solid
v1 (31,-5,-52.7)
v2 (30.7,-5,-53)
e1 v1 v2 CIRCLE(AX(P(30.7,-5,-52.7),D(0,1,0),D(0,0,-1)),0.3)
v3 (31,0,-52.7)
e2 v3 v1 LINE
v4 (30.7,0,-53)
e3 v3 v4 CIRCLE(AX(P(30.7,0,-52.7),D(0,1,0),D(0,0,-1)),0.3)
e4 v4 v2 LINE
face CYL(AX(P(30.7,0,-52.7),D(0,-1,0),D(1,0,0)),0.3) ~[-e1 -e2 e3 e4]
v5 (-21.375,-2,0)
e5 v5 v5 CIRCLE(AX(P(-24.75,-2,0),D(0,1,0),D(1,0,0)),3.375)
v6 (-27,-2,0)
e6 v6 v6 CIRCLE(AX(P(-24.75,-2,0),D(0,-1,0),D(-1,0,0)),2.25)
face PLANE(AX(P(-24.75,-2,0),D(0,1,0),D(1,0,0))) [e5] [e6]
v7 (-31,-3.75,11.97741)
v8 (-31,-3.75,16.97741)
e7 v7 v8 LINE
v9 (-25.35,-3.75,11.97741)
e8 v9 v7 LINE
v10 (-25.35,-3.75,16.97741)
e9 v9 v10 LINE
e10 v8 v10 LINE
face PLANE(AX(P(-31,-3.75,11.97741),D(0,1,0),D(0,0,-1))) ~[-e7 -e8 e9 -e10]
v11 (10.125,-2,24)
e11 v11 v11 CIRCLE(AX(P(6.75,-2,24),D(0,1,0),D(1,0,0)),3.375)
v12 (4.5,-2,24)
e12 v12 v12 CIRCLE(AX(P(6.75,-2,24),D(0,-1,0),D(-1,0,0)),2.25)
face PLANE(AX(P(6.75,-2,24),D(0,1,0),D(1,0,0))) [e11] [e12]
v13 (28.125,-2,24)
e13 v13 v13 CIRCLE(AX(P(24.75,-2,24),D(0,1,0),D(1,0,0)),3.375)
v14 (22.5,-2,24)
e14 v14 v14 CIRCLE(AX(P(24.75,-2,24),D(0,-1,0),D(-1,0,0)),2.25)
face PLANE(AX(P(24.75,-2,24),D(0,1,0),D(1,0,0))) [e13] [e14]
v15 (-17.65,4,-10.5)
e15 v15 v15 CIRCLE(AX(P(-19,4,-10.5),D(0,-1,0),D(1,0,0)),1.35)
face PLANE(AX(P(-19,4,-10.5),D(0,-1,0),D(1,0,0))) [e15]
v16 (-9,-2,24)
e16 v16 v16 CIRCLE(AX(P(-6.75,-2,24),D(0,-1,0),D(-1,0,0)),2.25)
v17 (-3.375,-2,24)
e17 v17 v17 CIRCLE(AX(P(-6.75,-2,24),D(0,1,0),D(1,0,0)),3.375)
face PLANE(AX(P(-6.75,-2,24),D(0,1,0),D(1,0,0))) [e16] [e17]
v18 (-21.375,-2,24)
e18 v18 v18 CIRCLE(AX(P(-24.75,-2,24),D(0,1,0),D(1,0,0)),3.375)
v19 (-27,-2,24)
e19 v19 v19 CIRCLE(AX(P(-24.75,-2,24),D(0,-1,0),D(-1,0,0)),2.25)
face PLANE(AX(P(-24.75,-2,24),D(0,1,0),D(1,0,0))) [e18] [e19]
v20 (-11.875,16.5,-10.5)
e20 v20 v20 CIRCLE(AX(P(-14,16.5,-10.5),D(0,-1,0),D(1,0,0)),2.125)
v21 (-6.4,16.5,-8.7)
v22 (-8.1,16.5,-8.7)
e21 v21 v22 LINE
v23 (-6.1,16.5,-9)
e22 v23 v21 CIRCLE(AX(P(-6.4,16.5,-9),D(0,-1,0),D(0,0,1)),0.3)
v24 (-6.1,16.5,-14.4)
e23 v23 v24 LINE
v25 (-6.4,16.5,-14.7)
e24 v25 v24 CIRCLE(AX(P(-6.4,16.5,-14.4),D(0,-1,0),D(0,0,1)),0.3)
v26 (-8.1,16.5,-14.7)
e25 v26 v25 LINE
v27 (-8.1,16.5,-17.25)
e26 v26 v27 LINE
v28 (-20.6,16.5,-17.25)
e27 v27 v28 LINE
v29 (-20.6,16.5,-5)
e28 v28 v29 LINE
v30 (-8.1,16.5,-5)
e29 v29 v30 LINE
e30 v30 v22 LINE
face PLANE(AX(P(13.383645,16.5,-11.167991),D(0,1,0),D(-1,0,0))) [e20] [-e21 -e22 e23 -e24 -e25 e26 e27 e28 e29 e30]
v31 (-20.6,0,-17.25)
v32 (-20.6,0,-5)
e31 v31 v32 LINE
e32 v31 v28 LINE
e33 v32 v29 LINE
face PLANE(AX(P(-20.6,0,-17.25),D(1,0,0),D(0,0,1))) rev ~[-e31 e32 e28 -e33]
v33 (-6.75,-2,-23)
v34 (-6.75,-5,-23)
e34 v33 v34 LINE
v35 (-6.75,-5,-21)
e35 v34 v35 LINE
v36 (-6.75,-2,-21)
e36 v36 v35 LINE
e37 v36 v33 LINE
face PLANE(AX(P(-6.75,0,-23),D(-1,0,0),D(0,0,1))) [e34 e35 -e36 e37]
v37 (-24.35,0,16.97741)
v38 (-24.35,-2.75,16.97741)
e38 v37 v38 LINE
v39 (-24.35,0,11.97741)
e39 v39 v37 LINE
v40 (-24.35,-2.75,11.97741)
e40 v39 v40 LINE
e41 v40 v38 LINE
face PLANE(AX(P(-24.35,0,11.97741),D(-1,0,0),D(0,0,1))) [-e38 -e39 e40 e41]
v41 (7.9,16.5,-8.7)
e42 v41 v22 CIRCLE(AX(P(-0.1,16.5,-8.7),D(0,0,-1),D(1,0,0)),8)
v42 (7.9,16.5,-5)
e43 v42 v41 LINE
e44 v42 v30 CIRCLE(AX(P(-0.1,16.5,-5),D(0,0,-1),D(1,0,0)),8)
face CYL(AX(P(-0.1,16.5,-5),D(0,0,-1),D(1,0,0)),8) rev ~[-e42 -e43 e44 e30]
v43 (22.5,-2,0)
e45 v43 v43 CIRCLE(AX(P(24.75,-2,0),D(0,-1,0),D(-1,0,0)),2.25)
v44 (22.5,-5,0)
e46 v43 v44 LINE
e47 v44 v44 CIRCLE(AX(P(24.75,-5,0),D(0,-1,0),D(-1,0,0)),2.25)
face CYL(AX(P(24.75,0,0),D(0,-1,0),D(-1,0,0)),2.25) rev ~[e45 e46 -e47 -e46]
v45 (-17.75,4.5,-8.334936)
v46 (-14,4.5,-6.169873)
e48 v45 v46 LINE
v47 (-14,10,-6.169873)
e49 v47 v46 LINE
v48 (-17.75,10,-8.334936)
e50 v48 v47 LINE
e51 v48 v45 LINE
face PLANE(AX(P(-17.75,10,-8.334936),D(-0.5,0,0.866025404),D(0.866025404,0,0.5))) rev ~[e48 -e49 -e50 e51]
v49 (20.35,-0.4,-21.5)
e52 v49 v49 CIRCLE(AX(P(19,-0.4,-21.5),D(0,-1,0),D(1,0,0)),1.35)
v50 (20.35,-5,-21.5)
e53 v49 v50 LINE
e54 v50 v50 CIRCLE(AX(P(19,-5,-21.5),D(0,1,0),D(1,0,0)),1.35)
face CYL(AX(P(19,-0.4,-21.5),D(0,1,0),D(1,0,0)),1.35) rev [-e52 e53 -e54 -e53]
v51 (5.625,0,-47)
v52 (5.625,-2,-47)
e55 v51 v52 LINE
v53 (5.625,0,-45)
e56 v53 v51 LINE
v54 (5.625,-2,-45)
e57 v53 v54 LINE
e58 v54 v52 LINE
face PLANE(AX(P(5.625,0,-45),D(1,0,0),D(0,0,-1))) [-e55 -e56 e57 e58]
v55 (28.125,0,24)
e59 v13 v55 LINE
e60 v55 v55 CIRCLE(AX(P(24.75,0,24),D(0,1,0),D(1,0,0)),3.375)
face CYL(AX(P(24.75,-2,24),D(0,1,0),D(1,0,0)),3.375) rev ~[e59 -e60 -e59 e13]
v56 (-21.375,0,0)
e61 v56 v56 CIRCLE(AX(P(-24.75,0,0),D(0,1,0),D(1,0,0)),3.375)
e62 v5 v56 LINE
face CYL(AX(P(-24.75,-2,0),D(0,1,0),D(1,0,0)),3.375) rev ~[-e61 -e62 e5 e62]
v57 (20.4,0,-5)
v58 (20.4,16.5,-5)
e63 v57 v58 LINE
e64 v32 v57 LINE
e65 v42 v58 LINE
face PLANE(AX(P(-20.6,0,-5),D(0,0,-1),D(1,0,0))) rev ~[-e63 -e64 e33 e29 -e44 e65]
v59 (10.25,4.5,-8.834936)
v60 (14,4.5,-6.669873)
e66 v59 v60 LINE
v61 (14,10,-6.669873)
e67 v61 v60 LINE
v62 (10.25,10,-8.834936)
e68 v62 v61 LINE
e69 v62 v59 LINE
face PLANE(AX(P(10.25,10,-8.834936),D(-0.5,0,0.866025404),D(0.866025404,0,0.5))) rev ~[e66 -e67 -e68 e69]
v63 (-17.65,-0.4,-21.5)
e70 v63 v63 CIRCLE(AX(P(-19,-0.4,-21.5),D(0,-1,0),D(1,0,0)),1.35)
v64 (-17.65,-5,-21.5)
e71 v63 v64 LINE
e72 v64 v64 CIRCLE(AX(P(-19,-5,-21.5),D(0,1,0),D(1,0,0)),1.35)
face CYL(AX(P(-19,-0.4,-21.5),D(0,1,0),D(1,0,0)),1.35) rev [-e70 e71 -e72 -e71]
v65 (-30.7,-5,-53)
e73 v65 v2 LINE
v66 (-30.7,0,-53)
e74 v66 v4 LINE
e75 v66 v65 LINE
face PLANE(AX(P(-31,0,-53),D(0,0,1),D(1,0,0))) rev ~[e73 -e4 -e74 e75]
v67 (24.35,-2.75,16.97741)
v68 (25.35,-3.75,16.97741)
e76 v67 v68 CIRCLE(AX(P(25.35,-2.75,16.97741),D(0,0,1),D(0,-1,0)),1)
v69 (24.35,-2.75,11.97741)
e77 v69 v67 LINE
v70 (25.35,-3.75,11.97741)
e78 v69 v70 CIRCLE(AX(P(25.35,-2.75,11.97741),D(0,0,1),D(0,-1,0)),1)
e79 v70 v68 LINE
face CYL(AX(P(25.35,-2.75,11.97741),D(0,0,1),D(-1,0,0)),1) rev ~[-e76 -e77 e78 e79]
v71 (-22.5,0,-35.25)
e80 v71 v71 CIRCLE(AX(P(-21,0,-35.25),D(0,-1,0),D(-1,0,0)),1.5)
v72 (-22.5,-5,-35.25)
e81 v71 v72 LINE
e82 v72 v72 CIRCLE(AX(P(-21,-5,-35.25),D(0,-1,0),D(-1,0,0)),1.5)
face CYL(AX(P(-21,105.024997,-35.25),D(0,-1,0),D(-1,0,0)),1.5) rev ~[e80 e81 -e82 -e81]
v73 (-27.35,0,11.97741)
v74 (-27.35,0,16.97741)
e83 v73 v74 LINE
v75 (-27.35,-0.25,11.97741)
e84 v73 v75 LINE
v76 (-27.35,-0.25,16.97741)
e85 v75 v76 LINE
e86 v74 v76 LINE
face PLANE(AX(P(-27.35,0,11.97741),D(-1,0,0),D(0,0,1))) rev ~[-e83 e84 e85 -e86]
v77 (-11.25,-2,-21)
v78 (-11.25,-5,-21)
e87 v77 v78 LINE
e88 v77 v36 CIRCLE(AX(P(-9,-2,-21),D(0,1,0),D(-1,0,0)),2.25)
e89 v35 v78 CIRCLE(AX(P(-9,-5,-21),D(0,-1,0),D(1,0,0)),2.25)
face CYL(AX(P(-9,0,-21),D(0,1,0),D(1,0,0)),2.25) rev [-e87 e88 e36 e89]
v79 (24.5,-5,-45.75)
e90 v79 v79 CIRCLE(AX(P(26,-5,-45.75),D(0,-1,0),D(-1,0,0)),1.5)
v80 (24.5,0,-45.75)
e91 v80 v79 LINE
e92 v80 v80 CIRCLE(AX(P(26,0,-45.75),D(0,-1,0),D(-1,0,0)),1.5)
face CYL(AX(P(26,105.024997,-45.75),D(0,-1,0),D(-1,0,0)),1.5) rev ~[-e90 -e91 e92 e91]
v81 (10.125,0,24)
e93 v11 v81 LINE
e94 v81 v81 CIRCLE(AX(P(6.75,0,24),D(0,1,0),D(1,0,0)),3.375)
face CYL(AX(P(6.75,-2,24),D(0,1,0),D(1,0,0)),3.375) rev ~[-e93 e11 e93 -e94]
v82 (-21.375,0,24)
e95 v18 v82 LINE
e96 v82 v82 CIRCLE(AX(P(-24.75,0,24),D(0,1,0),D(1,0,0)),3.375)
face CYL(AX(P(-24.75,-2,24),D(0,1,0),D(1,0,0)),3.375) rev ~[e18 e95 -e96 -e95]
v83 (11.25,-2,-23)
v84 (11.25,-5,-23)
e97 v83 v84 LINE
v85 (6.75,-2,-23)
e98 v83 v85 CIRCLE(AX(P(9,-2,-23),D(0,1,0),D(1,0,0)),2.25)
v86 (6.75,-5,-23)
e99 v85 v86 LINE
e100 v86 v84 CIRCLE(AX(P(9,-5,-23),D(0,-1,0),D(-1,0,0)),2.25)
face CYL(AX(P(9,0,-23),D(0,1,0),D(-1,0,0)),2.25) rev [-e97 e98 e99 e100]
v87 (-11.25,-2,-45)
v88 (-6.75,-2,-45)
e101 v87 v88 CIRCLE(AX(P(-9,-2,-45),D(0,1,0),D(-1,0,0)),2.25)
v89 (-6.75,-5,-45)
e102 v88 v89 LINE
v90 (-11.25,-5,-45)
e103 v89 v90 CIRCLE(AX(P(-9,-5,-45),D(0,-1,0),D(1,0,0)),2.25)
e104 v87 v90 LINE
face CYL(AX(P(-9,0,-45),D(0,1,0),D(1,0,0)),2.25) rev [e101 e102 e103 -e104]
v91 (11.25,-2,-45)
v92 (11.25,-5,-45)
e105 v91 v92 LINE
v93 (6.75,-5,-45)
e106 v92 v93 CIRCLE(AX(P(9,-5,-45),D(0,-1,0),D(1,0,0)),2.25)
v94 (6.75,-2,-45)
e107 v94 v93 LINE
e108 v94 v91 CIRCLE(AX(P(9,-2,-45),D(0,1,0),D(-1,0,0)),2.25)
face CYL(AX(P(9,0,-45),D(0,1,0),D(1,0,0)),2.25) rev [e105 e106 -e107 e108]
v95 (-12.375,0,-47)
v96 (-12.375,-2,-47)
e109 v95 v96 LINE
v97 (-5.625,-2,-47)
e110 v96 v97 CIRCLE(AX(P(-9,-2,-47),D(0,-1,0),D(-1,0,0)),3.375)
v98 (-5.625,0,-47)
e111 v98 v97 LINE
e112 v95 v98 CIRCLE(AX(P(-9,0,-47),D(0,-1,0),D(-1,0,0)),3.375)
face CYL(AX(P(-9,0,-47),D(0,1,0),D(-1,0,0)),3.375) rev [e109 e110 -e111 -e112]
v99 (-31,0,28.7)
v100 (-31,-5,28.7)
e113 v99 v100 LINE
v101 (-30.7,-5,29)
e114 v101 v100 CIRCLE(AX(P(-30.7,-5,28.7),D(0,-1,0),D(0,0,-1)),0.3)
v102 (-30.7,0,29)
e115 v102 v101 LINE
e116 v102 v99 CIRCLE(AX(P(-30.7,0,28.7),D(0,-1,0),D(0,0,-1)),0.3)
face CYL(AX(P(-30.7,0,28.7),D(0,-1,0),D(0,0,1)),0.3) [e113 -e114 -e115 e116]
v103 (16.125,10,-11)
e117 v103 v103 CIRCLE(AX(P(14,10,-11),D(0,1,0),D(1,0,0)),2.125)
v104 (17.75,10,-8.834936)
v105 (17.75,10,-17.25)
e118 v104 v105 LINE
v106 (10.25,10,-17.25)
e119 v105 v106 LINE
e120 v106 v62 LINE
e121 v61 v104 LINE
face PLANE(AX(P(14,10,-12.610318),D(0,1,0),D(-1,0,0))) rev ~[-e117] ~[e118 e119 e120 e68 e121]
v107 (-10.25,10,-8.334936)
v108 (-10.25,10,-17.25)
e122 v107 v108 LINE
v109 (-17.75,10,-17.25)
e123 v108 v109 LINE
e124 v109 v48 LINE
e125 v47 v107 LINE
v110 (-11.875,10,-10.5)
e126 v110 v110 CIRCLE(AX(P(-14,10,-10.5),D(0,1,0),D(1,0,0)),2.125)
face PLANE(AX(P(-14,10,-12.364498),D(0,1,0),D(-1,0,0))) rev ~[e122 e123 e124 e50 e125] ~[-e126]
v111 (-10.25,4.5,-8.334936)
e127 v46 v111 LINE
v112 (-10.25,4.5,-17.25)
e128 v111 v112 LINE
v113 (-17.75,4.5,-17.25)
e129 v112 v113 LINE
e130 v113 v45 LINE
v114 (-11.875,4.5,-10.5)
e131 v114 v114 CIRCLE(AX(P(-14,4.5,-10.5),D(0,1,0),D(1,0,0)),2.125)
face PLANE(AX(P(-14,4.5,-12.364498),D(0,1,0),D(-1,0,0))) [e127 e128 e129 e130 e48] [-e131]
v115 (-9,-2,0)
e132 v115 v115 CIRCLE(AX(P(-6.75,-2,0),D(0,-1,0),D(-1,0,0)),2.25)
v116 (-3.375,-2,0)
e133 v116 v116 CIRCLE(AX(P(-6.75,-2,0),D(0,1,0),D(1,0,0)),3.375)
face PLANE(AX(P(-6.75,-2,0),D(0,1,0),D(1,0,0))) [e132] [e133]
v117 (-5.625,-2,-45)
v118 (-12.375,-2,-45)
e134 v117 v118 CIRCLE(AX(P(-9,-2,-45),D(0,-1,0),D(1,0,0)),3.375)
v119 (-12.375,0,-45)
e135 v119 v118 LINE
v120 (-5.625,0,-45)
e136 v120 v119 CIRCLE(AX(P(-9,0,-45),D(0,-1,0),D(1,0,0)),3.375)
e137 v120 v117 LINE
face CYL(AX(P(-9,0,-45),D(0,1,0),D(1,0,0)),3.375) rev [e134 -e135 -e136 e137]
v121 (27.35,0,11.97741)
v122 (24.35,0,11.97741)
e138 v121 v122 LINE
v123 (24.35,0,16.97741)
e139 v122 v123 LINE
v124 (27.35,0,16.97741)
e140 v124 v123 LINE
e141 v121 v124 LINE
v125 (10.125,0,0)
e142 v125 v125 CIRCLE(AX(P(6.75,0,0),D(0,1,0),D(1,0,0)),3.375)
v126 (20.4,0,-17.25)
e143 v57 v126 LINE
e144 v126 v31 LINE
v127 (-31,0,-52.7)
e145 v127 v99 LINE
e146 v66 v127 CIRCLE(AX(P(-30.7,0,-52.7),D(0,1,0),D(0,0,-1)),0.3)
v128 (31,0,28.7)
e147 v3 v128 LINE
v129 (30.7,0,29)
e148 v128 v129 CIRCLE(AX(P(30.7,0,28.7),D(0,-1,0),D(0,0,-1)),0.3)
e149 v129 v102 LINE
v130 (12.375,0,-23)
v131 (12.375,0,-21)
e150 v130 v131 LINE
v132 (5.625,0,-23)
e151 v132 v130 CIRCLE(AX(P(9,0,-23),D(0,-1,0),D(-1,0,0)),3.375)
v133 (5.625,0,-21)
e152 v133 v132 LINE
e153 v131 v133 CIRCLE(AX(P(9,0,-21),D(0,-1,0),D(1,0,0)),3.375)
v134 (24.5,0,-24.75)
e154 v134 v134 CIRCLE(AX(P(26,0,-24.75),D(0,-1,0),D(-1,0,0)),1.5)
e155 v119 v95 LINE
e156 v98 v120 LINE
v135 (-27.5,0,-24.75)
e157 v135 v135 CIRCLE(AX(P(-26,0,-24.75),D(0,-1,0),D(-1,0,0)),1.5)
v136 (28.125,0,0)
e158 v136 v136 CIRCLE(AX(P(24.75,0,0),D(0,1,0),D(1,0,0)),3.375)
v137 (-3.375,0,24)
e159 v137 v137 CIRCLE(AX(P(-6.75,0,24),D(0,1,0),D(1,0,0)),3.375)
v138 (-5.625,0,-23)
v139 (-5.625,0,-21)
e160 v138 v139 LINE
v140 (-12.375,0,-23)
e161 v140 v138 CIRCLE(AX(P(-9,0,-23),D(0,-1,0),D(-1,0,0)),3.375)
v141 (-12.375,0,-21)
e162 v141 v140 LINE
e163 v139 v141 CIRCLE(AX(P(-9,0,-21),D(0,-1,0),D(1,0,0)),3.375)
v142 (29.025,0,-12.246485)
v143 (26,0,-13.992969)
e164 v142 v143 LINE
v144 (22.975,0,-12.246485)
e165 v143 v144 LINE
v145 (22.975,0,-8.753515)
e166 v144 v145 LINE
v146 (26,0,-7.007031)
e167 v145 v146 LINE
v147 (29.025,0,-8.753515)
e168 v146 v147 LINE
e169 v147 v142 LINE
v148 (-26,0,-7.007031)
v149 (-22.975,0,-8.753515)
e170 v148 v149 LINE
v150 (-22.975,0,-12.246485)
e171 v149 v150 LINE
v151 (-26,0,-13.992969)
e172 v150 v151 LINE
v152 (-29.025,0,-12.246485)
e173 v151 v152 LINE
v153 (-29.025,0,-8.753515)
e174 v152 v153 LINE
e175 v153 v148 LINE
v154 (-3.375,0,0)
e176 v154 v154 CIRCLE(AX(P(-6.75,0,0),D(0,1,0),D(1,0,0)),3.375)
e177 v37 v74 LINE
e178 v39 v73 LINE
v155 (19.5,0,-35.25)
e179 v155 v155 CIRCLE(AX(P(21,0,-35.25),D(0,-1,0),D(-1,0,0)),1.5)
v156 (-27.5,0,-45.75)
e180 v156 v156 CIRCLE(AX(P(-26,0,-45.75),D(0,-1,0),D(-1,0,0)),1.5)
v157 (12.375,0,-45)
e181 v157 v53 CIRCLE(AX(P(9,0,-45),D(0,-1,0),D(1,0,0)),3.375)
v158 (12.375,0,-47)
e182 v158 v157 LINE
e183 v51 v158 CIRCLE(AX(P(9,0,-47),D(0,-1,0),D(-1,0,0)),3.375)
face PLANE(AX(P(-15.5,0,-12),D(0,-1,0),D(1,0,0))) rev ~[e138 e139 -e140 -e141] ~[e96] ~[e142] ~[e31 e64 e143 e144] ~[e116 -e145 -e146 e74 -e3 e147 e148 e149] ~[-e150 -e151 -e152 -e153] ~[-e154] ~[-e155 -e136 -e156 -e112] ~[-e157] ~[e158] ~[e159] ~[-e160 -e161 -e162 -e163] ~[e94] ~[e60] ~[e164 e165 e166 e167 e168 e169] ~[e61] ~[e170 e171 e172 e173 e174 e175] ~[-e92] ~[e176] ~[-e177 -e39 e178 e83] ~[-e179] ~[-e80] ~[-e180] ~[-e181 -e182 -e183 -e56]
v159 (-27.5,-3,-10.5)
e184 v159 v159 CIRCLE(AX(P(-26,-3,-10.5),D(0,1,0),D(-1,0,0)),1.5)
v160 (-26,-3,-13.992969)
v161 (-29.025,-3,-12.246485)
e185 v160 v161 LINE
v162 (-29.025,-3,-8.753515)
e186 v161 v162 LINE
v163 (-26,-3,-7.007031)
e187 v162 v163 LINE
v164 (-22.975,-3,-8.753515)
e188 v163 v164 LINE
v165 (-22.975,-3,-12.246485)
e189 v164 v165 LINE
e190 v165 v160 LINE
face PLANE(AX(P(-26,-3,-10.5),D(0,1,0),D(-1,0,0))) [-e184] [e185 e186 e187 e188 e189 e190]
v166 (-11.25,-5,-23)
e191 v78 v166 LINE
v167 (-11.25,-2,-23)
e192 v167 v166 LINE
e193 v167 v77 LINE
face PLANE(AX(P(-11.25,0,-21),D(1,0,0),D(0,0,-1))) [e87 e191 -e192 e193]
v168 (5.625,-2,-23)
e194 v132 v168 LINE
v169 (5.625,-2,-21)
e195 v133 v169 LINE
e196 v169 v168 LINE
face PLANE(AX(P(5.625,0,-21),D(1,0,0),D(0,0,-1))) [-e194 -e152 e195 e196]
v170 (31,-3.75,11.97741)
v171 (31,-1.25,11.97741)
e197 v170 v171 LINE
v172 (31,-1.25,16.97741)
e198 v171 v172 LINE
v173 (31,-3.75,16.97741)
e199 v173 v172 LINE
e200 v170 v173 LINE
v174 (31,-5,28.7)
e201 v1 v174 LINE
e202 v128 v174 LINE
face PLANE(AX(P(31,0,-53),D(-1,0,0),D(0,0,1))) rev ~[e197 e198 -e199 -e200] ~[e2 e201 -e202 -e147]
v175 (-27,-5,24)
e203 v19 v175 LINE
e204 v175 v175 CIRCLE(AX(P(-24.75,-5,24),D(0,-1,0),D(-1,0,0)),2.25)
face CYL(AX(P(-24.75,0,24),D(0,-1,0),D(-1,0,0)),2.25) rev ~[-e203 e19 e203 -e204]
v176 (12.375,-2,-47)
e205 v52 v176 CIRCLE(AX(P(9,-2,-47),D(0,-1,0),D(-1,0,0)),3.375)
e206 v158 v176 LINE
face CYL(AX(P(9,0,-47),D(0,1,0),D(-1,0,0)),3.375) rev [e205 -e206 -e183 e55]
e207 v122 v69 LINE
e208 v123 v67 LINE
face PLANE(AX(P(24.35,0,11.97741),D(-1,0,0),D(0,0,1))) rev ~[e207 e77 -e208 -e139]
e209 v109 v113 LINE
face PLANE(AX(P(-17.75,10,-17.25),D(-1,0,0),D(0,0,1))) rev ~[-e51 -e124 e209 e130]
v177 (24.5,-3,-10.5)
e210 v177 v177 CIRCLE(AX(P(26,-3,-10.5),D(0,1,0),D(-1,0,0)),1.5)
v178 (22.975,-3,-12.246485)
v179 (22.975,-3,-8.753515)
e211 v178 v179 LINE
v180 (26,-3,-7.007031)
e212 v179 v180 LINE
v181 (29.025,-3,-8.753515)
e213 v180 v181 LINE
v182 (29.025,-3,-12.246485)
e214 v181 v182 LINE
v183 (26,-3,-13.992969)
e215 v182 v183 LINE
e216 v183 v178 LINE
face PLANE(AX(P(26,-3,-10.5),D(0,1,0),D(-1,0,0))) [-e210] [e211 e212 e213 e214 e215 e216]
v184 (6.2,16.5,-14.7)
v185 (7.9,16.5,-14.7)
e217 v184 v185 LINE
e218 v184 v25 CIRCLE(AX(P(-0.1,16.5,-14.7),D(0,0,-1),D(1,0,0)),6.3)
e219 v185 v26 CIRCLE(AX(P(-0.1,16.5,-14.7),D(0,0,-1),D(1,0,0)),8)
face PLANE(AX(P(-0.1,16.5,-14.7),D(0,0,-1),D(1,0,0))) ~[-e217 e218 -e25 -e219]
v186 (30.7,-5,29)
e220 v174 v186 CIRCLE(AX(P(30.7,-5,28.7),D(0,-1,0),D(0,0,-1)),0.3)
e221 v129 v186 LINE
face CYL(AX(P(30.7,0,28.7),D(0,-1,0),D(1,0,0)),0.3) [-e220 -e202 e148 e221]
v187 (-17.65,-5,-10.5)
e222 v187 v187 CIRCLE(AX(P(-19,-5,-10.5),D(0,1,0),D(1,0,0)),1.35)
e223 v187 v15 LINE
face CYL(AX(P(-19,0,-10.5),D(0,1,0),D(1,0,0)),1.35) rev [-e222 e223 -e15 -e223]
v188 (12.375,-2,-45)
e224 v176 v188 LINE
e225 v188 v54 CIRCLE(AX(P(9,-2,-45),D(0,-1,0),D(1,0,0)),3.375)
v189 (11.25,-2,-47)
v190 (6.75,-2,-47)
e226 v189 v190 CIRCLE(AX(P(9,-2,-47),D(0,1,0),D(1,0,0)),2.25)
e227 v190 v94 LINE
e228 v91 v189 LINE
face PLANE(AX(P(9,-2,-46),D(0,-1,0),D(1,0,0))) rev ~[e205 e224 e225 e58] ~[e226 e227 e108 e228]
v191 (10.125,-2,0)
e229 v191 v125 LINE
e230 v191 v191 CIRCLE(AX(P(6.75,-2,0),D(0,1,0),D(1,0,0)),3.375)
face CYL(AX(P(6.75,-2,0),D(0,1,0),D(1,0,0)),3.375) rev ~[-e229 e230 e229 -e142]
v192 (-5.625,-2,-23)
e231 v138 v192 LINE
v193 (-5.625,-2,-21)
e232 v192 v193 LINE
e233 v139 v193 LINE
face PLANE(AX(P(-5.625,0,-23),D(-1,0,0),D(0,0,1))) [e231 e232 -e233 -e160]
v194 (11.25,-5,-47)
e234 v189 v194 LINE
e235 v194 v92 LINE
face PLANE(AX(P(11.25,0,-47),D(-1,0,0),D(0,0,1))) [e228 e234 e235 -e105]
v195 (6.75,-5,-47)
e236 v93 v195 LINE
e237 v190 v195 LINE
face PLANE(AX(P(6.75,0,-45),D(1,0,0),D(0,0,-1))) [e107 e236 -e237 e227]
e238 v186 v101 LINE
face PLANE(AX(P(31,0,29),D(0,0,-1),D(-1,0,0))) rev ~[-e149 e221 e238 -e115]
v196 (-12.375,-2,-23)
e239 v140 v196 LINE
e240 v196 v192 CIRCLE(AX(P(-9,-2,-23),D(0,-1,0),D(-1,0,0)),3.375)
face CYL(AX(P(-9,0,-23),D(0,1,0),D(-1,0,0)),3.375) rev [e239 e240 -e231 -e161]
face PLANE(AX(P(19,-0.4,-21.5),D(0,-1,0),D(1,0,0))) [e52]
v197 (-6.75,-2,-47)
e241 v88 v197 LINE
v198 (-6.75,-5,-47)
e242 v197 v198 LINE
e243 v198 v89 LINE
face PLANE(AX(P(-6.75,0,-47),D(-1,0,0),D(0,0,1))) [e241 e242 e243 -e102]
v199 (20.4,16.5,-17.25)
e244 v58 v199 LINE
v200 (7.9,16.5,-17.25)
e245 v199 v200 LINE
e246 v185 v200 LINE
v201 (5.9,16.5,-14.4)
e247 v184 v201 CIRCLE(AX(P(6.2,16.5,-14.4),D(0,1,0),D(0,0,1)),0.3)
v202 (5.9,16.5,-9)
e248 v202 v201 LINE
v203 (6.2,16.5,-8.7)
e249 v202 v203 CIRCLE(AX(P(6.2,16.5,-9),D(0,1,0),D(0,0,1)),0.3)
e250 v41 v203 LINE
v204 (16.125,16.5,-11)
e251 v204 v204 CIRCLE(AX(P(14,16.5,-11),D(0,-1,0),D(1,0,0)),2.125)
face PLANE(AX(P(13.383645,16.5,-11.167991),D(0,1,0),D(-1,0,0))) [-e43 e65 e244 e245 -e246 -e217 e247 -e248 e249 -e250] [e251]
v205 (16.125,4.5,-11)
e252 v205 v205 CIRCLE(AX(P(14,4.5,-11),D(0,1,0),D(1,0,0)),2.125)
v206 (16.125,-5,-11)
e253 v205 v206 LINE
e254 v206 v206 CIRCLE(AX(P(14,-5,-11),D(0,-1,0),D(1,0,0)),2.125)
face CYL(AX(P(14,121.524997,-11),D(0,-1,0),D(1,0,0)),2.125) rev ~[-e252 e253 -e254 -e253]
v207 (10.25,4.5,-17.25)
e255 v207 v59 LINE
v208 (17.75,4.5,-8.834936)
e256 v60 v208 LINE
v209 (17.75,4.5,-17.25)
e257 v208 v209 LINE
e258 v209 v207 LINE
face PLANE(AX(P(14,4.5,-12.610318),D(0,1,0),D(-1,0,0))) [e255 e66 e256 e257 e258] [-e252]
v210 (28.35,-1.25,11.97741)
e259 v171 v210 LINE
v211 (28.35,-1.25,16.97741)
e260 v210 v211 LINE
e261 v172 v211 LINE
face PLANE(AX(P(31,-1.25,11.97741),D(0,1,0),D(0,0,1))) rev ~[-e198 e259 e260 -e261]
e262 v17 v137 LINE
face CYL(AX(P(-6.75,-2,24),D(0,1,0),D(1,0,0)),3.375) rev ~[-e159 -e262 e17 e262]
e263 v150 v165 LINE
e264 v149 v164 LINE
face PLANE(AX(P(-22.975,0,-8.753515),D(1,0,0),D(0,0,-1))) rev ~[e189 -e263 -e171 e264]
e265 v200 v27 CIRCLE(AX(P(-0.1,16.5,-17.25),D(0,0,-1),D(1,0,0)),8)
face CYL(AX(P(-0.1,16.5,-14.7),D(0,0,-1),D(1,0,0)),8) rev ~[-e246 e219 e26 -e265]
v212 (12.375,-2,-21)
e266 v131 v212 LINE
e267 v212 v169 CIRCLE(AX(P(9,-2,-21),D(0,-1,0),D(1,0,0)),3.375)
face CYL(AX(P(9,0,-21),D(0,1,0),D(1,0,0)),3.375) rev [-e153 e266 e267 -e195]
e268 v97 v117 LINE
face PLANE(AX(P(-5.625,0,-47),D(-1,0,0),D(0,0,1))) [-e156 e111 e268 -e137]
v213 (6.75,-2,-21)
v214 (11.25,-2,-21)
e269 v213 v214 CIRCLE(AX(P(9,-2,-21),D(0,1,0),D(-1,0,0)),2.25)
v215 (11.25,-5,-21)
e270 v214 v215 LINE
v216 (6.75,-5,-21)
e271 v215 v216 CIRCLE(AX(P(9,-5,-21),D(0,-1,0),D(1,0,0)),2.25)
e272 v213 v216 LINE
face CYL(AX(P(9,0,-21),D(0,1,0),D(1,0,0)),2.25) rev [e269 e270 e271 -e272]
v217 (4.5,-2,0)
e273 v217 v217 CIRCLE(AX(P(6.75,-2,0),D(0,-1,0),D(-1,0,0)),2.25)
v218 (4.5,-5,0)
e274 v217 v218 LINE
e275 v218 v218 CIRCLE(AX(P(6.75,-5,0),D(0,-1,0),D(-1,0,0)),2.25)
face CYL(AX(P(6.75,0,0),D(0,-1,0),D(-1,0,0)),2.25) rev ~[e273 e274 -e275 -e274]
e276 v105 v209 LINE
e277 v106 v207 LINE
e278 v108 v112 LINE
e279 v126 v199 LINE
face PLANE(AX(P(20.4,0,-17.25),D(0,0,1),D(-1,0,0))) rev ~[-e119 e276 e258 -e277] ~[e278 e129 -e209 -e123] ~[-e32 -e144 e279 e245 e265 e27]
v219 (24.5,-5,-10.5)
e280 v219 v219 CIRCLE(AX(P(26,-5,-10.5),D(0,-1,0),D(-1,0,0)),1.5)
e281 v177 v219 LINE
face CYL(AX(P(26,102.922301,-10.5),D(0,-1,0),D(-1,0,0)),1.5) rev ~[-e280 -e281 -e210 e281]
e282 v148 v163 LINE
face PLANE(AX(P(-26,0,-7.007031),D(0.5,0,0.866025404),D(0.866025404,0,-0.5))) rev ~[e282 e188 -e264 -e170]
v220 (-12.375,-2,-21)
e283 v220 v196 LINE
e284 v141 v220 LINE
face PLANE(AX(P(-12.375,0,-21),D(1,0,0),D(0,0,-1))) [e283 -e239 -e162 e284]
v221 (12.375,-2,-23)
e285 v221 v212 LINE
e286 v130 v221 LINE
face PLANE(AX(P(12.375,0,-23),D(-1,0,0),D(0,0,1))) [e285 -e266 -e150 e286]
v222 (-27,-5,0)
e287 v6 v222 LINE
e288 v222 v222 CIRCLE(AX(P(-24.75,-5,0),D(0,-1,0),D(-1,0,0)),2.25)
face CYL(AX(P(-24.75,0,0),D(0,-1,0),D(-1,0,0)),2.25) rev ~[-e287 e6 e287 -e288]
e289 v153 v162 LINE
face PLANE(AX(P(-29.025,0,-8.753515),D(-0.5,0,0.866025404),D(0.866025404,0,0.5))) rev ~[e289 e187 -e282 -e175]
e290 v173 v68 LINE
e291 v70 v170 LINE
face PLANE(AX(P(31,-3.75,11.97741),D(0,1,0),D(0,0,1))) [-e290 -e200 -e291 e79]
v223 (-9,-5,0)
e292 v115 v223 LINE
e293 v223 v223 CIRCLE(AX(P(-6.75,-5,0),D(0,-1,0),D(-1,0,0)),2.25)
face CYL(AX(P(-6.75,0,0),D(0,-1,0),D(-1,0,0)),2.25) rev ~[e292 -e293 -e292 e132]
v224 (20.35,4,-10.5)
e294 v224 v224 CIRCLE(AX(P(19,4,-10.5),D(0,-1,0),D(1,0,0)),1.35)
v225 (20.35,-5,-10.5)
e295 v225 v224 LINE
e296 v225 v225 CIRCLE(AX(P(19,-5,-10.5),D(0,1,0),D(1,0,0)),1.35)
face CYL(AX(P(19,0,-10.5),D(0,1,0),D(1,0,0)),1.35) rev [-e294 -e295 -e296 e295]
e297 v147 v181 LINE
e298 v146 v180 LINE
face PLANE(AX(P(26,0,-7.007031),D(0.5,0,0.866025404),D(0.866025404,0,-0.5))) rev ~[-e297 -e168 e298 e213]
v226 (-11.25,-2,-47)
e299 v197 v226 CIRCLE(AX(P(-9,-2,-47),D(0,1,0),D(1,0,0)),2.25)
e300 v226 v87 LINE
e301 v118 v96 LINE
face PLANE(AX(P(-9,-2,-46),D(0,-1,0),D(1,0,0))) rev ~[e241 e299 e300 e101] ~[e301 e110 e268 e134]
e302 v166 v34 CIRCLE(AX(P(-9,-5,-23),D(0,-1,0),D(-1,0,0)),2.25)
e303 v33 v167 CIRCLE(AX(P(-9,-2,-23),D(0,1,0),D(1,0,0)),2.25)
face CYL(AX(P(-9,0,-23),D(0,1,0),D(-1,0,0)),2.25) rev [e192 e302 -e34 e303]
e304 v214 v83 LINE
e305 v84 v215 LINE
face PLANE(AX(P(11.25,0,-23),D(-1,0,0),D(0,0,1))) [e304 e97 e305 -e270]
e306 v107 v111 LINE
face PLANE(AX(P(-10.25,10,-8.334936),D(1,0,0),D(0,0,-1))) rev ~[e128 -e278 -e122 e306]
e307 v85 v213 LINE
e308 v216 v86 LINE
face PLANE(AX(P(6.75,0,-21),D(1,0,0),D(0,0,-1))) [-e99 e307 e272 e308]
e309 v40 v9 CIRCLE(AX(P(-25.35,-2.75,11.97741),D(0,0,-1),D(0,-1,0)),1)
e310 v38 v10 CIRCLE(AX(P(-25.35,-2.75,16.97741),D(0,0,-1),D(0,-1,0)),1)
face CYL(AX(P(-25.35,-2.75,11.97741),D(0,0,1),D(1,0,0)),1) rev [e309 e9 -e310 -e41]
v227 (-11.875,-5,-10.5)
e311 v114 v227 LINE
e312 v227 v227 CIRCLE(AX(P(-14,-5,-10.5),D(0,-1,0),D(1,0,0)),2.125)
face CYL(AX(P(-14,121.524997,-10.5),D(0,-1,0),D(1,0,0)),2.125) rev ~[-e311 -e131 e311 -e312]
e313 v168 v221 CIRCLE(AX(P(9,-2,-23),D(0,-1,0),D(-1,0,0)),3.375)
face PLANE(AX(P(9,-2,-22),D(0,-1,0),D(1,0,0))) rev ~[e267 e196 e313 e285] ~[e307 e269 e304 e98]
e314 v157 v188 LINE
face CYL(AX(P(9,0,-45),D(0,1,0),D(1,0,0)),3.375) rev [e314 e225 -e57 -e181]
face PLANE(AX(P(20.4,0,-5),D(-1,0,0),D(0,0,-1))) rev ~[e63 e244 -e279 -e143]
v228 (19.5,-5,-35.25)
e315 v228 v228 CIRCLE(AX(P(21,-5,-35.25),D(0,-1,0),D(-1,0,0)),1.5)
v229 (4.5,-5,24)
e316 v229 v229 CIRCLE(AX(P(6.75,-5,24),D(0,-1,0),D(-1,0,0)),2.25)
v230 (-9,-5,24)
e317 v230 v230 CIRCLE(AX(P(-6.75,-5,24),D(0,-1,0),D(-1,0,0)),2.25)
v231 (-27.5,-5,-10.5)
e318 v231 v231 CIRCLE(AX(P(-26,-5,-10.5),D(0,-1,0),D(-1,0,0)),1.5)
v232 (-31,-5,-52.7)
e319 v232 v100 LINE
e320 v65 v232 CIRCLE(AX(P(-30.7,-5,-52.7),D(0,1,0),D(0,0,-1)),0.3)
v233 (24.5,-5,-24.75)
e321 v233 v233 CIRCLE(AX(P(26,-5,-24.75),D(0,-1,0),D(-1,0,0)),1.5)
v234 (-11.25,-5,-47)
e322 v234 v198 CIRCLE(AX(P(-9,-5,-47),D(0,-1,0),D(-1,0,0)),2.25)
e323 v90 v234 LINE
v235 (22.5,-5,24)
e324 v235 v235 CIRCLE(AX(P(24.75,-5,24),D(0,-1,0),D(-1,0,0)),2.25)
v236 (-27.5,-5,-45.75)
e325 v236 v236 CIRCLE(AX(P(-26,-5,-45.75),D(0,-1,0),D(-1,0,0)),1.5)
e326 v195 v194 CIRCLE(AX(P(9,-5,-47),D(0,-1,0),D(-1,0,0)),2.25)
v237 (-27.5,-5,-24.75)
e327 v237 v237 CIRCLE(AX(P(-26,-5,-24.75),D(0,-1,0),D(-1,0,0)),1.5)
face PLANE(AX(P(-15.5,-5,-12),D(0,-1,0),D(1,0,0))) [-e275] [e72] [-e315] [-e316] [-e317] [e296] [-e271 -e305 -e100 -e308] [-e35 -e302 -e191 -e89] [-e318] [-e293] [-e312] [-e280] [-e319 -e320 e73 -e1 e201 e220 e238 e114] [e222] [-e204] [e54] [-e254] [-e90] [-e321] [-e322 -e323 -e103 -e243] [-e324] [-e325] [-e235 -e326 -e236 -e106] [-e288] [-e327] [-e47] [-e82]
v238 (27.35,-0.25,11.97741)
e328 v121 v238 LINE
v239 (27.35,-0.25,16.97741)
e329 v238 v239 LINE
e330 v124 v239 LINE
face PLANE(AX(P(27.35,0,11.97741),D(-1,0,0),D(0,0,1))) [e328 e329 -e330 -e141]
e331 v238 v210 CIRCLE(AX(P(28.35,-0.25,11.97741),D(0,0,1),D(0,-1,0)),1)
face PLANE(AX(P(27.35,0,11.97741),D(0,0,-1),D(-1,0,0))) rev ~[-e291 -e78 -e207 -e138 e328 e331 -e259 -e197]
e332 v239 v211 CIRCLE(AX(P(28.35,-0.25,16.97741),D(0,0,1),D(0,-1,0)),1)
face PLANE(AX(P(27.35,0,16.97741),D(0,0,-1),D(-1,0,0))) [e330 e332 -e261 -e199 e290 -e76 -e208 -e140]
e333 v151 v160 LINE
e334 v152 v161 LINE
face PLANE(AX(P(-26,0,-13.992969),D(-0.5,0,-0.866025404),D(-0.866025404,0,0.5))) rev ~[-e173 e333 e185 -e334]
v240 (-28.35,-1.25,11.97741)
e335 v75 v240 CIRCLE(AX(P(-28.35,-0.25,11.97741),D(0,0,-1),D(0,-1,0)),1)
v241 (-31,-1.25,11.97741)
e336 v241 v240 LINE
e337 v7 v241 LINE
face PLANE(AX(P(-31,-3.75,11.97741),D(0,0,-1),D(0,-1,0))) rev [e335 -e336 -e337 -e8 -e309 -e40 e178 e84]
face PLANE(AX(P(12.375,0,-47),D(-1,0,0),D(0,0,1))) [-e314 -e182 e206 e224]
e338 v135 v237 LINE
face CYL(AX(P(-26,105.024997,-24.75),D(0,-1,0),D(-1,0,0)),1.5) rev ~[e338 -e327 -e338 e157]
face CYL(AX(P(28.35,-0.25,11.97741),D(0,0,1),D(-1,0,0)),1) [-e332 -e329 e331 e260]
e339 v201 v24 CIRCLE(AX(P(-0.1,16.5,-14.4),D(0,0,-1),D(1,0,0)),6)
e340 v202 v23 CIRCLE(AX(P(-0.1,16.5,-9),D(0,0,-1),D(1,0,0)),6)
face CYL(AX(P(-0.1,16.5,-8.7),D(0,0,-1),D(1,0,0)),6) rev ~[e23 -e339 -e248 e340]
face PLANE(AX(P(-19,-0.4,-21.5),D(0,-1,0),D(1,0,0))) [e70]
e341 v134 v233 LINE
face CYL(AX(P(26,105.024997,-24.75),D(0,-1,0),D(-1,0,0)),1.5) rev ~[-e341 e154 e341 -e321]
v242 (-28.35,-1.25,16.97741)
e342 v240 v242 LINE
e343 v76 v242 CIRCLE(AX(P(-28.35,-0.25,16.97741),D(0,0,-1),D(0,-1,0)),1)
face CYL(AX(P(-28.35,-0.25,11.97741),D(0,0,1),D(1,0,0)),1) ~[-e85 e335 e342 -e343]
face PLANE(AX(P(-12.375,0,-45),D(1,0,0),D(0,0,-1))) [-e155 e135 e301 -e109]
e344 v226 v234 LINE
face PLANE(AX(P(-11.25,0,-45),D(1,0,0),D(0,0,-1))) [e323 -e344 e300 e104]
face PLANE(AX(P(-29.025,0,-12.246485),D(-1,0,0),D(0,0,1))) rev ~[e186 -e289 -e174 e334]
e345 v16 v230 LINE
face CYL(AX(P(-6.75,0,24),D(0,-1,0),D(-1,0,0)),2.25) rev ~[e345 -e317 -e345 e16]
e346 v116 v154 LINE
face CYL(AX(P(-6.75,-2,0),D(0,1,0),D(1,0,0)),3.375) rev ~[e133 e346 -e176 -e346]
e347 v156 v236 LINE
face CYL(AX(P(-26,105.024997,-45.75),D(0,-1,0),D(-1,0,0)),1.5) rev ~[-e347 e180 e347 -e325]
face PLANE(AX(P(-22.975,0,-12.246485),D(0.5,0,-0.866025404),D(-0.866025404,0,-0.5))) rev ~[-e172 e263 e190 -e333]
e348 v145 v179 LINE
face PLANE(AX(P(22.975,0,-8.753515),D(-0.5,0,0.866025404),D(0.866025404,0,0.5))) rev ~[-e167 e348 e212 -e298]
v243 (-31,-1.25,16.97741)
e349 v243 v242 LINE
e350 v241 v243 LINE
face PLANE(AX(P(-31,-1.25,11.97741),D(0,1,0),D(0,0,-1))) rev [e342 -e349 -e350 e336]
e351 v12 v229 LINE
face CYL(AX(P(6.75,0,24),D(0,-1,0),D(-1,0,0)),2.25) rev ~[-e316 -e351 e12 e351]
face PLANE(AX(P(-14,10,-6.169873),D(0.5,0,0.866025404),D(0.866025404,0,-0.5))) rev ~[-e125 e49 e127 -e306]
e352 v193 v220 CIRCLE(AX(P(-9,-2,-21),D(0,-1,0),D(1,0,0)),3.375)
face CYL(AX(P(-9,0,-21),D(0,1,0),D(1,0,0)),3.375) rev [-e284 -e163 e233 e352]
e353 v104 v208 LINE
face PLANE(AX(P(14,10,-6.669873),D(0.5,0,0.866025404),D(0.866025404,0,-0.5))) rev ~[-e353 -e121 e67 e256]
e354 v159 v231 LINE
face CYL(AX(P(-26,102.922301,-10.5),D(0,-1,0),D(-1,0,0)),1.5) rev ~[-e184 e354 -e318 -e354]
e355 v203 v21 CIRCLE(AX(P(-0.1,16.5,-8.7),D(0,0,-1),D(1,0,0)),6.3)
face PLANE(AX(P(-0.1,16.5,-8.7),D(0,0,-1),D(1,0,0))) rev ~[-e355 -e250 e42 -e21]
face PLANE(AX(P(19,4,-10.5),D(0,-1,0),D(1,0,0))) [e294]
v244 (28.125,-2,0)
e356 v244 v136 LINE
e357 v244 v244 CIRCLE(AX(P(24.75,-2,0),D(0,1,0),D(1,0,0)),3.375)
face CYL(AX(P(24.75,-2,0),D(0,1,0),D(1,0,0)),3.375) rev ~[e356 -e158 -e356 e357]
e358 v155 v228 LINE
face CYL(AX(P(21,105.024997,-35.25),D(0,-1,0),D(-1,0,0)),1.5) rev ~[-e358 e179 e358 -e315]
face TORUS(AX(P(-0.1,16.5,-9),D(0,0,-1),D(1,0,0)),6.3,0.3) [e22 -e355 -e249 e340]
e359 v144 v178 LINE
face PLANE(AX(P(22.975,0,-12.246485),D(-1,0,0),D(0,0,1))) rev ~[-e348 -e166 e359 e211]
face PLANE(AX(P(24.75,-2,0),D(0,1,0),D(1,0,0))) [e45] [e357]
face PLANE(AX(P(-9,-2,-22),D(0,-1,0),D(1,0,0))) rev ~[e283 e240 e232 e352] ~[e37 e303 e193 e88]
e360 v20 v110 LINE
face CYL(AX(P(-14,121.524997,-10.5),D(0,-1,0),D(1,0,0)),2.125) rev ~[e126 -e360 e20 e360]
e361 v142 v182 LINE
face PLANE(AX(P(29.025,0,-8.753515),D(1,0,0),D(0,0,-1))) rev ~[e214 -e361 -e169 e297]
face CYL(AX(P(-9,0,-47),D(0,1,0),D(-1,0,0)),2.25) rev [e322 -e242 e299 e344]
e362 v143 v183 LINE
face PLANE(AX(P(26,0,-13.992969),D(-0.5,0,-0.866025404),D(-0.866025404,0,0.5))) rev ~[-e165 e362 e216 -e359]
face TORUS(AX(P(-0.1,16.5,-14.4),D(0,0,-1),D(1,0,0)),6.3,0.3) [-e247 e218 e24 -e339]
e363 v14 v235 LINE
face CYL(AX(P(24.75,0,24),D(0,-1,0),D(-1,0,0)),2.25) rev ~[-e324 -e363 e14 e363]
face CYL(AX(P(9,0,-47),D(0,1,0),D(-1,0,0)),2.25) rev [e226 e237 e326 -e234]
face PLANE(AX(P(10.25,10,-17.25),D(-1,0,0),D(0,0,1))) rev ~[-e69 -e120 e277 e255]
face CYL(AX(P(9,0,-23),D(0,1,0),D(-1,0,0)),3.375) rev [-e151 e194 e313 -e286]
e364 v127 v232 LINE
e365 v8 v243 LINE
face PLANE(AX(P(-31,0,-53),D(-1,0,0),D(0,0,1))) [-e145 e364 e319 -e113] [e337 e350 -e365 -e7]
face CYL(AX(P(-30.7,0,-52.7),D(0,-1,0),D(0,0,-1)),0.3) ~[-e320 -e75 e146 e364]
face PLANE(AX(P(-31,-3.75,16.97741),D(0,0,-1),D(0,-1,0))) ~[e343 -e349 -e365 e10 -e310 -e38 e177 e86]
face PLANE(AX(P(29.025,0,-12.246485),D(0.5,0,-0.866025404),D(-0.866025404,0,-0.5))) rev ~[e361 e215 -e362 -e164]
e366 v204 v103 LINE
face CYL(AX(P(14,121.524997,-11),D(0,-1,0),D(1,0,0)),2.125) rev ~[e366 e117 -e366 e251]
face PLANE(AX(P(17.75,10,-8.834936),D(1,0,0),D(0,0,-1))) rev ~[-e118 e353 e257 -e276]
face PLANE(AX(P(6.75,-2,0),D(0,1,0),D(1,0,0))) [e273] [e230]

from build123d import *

# Parameters (mm, degrees)
F1_W           = 31
F1_H           = 82
F2_DEPTH       = 5
F3_D           = 4.5
F3_CBORE_D     = 6.75
F3_CBORE_DEPTH = 2
F4_DEPTH       = 5
F5_DEPTH       = 2
F6_START       = 0.4
F0_R           = 1.35
F6_DEPTH       = 4.601
F7_D           = 3
F8_R           = 1.5
F9_DEPTH       = 3
F11_DEPTH      = 16.5
F15_D          = 4.25
F16_D          = 3
F18_R          = 2.125
F19_DEPTH      = 5.5
F20_W          = 3
F20_H          = 5
F21_DEPTH      = 3.75
F22_W          = 2.5
F22_H          = 5
F23_DEPTH      = 3.65
F24_R          = 1
F25_DEPTH      = 4
F25_DEPTH_BACK = 5.001
F26_R          = 0.3


# Not quite as in the source:
# - a pattern or mirror of a feature is missing from the dataset's text; its kind, count and spacing are read off the source's solid


with BuildPart() as f2:
    # F1 (on Front) → F2 (new body)
    with BuildSketch(Plane.XZ):
        with Locations((-15.5, -12)):
            Rectangle(F1_W, F1_H)
        with Locations((15.5, -12)):
            Rectangle(F1_W, F1_H)
    extrude(amount=F2_DEPTH)

    # F3 (through all)
    with Locations(Plane(origin=(0, 0, 0), x_dir=(1, 0, 0), z_dir=(0, 1, 0))):
        with Locations((24.75, -24), (6.75, -24), (-6.75, -24), (-24.75, -24), (-24.75, 0), (-6.75, 0), (6.75, 0), (24.75, 0)):
            CounterBoreHole(F3_D / 2, F3_CBORE_D / 2, F3_CBORE_DEPTH)

    # F0 (on Front) → F4 (cut, through all)
    with BuildSketch(Plane.XZ):
        with BuildLine():
            ThreePointArc((6.75, -23), (9, -25.25), (11.25, -23))
            Line((11.25, -23), (11.25, -21))
            ThreePointArc((11.25, -21), (9, -18.75), (6.75, -21))
            Line((6.75, -21), (6.75, -23))
        make_face()
        with BuildLine():
            Line((-6.75, -23), (-6.75, -21))
            ThreePointArc((-6.75, -21), (-9, -18.75), (-11.25, -21))
            Line((-11.25, -21), (-11.25, -23))
            ThreePointArc((-11.25, -23), (-9, -25.25), (-6.75, -23))
        make_face()
        with BuildLine():
            ThreePointArc((6.75, -47), (9, -49.25), (11.25, -47))
            Line((11.25, -47), (11.25, -45))
            ThreePointArc((11.25, -45), (9, -42.75), (6.75, -45))
            Line((6.75, -45), (6.75, -47))
        make_face()
        with BuildLine():
            Line((-6.75, -47), (-6.75, -45))
            ThreePointArc((-6.75, -45), (-9, -42.75), (-11.25, -45))
            Line((-11.25, -45), (-11.25, -47))
            ThreePointArc((-11.25, -47), (-9, -49.25), (-6.75, -47))
        make_face()
    extrude(amount=F4_DEPTH, mode=Mode.SUBTRACT)

    # F0 (on Front) → F5 (cut)
    with BuildSketch(Plane.XZ):
        with BuildLine():
            ThreePointArc((12.375, -21), (9, -17.625), (5.625, -21))
            Line((5.625, -21), (5.625, -23))
            ThreePointArc((5.625, -23), (9, -26.375), (12.375, -23))
            Line((12.375, -23), (12.375, -21))
        make_face()
        with BuildLine():
            Line((11.25, -21), (11.25, -23))
            ThreePointArc((11.25, -23), (9, -25.25), (6.75, -23))
            Line((6.75, -23), (6.75, -21))
            ThreePointArc((6.75, -21), (9, -18.75), (11.25, -21))
        make_face(mode=Mode.SUBTRACT)
        with BuildLine():
            Line((-5.625, -23), (-5.625, -21))
            ThreePointArc((-5.625, -21), (-9, -17.625), (-12.375, -21))
            Line((-12.375, -21), (-12.375, -23))
            ThreePointArc((-12.375, -23), (-9, -26.375), (-5.625, -23))
        make_face()
        with BuildLine():
            ThreePointArc((-11.25, -21), (-9, -18.75), (-6.75, -21))
            Line((-6.75, -21), (-6.75, -23))
            ThreePointArc((-6.75, -23), (-9, -25.25), (-11.25, -23))
            Line((-11.25, -23), (-11.25, -21))
        make_face(mode=Mode.SUBTRACT)
        with BuildLine():
            Line((-5.625, -47), (-5.625, -45))
            ThreePointArc((-5.625, -45), (-9, -41.625), (-12.375, -45))
            Line((-12.375, -45), (-12.375, -47))
            ThreePointArc((-12.375, -47), (-9, -50.375), (-5.625, -47))
        make_face()
        with BuildLine():
            ThreePointArc((-11.25, -45), (-9, -42.75), (-6.75, -45))
            Line((-6.75, -45), (-6.75, -47))
            ThreePointArc((-6.75, -47), (-9, -49.25), (-11.25, -47))
            Line((-11.25, -47), (-11.25, -45))
        make_face(mode=Mode.SUBTRACT)
        with BuildLine():
            ThreePointArc((12.375, -45), (9, -41.625), (5.625, -45))
            Line((5.625, -45), (5.625, -47))
            ThreePointArc((5.625, -47), (9, -50.375), (12.375, -47))
            Line((12.375, -47), (12.375, -45))
        make_face()
        with BuildLine():
            Line((11.25, -45), (11.25, -47))
            ThreePointArc((11.25, -47), (9, -49.25), (6.75, -47))
            Line((6.75, -47), (6.75, -45))
            ThreePointArc((6.75, -45), (9, -42.75), (11.25, -45))
        make_face(mode=Mode.SUBTRACT)
    extrude(amount=F5_DEPTH, mode=Mode.SUBTRACT)

    # F0 (on Front) → F6 (cut)
    with BuildSketch(Plane.XZ.offset(F6_START)):
        with Locations((-19, -21.5)):
            Circle(F0_R)
        with Locations((19, -21.5)):
            Circle(F0_R)
    extrude(amount=F6_DEPTH, mode=Mode.SUBTRACT)

    # F7 (through all)
    with Locations(Plane(origin=(0, 0, 0), x_dir=(1, 0, 0), z_dir=(0, 1, 0))):
        with Locations((26, 10.5), (-26, 10.5)):
            Hole(F7_D / 2)

    # F8 (on face) → F9 (cut)
    with BuildSketch(Plane(origin=(0, 0, 0), x_dir=(-1, 0, 0), z_dir=(0, 1, 0))):
        Polygon((29.025, -12.2464845643), (29.025, -8.7535154357), (26, -7.0070308714), (22.975, -8.7535154357), (22.975, -12.2464845643), (26, -13.9929691286), align=None)
        with Locations((26, -10.5)):
            Circle(F8_R, mode=Mode.SUBTRACT)
        Polygon((-22.975, -12.2464845643), (-22.975, -8.7535154357), (-26, -7.0070308714), (-29.025, -8.7535154357), (-29.025, -12.2464845643), (-26, -13.9929691286), align=None)
        with Locations((-26, -10.5)):
            Circle(F8_R, mode=Mode.SUBTRACT)
    extrude(amount=-F9_DEPTH, mode=Mode.SUBTRACT)

    # F10 (on face) → F11 (join)
    with BuildSketch(Plane(origin=(0, 0, 0), x_dir=(-1, 0, 0), z_dir=(0, 1, 0))):
        Polygon((-7.9, -5), (-20.4, -5), (-20.4, -17.25), (-7.9, -17.25), (-7.9, -14.7), (-5.9, -14.7), (-5.9, -8.7), (-7.9, -8.7), align=None)
        Polygon((0.1, -5), (-7.9, -5), (-7.9, -8.7), (-5.9, -8.7), (-5.9, -14.7), (-7.9, -14.7), (-7.9, -17.25), (0.1, -17.25), (20.6, -17.25), (20.6, -5), (1.3771316735, -5), align=None)
    extrude(amount=F11_DEPTH)

    # F12 (on face) → F13 (revolve, cut)
    with BuildSketch(Plane(origin=(0, 16.5, 0), x_dir=(-1, 0, 0), z_dir=(0, 1, 0))):
        Polygon((0.1, -5), (-7.9, -5), (-7.9, -8.7), (-5.9, -8.7), (-5.9, -14.7), (-7.9, -14.7), (-7.9, -17.25), (0.1, -17.25), align=None)
    revolve(axis=Axis((-0.1, 16.5, -11.8110565236), (0, 0, -1)), mode=Mode.SUBTRACT)

    # F15 (through all)
    with Locations(Plane(origin=(0, 16.5, 0), x_dir=(-1, 0, 0), z_dir=(0, 1, 0))):
        with Locations((-14, -11), (14, -10.5)):
            Hole(F15_D / 2)

    # F16 (through all)
    with Locations(Plane(origin=(0, 0, 0), x_dir=(1, 0, 0), z_dir=(0, 1, 0))):
        with Locations((26, 24.75), (21, 35.25), (26, 45.75), (-21, 35.25), (-26, 24.75), (-26, 45.75)):
            Hole(F16_D / 2)

    # F18 (on offset) → F19 (cut)
    with BuildSketch(Plane(origin=(0, 10, 0), x_dir=(-1, 0, 0), z_dir=(0, 1, 0))):
        Polygon((10.25, -12.6650635095), (10.25, -17.25), (17.75, -17.25), (17.75, -12.6650635095), (17.75, -8.3349364905), (14, -6.1698729811), (10.25, -8.3349364905), align=None)
        with Locations((14, -10.5)):
            Circle(F18_R, mode=Mode.SUBTRACT)
        Polygon((-10.25, -13.1650635095), (-10.25, -8.8349364905), (-14, -6.6698729811), (-17.75, -8.8349364905), (-17.75, -13.1650635095), (-17.75, -17.25), (-10.25, -17.25), align=None)
        with Locations((-14, -11)):
            Circle(F18_R, mode=Mode.SUBTRACT)
    extrude(amount=-F19_DEPTH, mode=Mode.SUBTRACT)

    # F20 (on face) → F21 (cut)
    with BuildSketch(Plane(origin=(0, 0, 0), x_dir=(-1, 0, 0), z_dir=(0, 1, 0))):
        with Locations((-25.85, 14.4774101714)):
            Rectangle(F20_W, F20_H)
        with Locations((25.85, 14.4774101714)):
            Rectangle(F20_W, F20_H)
    extrude(amount=-F21_DEPTH, mode=Mode.SUBTRACT)

    # F22 (on face) → F23 (cut, through all)
    with BuildSketch(Plane.YZ.offset(31)):
        with Locations((-2.5, 14.4774101714)):
            Rectangle(F22_W, F22_H)
    f23 = extrude(amount=-F23_DEPTH, mode=Mode.SUBTRACT)

    # F23_copies: F23 across plane
    add(f23.mirror(Plane(origin=(0, 0, 0), x_dir=(0, 0, -1), z_dir=(-1, 0, 0))), mode=Mode.SUBTRACT)

    # F24
    f24_edges = [f2.edges().sort_by_distance(p)[0] for p in [
        (24.35, -3.75, 14.47741),
        (27.35, -1.25, 14.47741),
        (-24.35, -3.75, 14.47741),
        (-27.35, -1.25, 14.47741),
    ]]
    fillet(f24_edges, radius=F24_R)

    # F0 (on Front) → F25 (cut, two sides)
    with BuildSketch(Plane.XZ) as f25_sk:
        with Locations((-19, -10.5)):
            Circle(F0_R)
        with Locations((19, -10.5)):
            Circle(F0_R)
    extrude(amount=-F25_DEPTH, mode=Mode.SUBTRACT)
    extrude(f25_sk.sketch, amount=F25_DEPTH_BACK, mode=Mode.SUBTRACT)

    # F26
    f26_edges = [f2.edges().sort_by_distance(p)[0] for p in [
        (-31, -2.5, 29),
        (31, -2.5, 29),
        (31, -2.5, -53),
        (-31, -2.5, -53),
        (-0.1, 10.5, -8.7),
        (-0.1, 10.5, -14.7),
    ]]
    fillet(f26_edges, radius=F26_R)


solid = f2.part
